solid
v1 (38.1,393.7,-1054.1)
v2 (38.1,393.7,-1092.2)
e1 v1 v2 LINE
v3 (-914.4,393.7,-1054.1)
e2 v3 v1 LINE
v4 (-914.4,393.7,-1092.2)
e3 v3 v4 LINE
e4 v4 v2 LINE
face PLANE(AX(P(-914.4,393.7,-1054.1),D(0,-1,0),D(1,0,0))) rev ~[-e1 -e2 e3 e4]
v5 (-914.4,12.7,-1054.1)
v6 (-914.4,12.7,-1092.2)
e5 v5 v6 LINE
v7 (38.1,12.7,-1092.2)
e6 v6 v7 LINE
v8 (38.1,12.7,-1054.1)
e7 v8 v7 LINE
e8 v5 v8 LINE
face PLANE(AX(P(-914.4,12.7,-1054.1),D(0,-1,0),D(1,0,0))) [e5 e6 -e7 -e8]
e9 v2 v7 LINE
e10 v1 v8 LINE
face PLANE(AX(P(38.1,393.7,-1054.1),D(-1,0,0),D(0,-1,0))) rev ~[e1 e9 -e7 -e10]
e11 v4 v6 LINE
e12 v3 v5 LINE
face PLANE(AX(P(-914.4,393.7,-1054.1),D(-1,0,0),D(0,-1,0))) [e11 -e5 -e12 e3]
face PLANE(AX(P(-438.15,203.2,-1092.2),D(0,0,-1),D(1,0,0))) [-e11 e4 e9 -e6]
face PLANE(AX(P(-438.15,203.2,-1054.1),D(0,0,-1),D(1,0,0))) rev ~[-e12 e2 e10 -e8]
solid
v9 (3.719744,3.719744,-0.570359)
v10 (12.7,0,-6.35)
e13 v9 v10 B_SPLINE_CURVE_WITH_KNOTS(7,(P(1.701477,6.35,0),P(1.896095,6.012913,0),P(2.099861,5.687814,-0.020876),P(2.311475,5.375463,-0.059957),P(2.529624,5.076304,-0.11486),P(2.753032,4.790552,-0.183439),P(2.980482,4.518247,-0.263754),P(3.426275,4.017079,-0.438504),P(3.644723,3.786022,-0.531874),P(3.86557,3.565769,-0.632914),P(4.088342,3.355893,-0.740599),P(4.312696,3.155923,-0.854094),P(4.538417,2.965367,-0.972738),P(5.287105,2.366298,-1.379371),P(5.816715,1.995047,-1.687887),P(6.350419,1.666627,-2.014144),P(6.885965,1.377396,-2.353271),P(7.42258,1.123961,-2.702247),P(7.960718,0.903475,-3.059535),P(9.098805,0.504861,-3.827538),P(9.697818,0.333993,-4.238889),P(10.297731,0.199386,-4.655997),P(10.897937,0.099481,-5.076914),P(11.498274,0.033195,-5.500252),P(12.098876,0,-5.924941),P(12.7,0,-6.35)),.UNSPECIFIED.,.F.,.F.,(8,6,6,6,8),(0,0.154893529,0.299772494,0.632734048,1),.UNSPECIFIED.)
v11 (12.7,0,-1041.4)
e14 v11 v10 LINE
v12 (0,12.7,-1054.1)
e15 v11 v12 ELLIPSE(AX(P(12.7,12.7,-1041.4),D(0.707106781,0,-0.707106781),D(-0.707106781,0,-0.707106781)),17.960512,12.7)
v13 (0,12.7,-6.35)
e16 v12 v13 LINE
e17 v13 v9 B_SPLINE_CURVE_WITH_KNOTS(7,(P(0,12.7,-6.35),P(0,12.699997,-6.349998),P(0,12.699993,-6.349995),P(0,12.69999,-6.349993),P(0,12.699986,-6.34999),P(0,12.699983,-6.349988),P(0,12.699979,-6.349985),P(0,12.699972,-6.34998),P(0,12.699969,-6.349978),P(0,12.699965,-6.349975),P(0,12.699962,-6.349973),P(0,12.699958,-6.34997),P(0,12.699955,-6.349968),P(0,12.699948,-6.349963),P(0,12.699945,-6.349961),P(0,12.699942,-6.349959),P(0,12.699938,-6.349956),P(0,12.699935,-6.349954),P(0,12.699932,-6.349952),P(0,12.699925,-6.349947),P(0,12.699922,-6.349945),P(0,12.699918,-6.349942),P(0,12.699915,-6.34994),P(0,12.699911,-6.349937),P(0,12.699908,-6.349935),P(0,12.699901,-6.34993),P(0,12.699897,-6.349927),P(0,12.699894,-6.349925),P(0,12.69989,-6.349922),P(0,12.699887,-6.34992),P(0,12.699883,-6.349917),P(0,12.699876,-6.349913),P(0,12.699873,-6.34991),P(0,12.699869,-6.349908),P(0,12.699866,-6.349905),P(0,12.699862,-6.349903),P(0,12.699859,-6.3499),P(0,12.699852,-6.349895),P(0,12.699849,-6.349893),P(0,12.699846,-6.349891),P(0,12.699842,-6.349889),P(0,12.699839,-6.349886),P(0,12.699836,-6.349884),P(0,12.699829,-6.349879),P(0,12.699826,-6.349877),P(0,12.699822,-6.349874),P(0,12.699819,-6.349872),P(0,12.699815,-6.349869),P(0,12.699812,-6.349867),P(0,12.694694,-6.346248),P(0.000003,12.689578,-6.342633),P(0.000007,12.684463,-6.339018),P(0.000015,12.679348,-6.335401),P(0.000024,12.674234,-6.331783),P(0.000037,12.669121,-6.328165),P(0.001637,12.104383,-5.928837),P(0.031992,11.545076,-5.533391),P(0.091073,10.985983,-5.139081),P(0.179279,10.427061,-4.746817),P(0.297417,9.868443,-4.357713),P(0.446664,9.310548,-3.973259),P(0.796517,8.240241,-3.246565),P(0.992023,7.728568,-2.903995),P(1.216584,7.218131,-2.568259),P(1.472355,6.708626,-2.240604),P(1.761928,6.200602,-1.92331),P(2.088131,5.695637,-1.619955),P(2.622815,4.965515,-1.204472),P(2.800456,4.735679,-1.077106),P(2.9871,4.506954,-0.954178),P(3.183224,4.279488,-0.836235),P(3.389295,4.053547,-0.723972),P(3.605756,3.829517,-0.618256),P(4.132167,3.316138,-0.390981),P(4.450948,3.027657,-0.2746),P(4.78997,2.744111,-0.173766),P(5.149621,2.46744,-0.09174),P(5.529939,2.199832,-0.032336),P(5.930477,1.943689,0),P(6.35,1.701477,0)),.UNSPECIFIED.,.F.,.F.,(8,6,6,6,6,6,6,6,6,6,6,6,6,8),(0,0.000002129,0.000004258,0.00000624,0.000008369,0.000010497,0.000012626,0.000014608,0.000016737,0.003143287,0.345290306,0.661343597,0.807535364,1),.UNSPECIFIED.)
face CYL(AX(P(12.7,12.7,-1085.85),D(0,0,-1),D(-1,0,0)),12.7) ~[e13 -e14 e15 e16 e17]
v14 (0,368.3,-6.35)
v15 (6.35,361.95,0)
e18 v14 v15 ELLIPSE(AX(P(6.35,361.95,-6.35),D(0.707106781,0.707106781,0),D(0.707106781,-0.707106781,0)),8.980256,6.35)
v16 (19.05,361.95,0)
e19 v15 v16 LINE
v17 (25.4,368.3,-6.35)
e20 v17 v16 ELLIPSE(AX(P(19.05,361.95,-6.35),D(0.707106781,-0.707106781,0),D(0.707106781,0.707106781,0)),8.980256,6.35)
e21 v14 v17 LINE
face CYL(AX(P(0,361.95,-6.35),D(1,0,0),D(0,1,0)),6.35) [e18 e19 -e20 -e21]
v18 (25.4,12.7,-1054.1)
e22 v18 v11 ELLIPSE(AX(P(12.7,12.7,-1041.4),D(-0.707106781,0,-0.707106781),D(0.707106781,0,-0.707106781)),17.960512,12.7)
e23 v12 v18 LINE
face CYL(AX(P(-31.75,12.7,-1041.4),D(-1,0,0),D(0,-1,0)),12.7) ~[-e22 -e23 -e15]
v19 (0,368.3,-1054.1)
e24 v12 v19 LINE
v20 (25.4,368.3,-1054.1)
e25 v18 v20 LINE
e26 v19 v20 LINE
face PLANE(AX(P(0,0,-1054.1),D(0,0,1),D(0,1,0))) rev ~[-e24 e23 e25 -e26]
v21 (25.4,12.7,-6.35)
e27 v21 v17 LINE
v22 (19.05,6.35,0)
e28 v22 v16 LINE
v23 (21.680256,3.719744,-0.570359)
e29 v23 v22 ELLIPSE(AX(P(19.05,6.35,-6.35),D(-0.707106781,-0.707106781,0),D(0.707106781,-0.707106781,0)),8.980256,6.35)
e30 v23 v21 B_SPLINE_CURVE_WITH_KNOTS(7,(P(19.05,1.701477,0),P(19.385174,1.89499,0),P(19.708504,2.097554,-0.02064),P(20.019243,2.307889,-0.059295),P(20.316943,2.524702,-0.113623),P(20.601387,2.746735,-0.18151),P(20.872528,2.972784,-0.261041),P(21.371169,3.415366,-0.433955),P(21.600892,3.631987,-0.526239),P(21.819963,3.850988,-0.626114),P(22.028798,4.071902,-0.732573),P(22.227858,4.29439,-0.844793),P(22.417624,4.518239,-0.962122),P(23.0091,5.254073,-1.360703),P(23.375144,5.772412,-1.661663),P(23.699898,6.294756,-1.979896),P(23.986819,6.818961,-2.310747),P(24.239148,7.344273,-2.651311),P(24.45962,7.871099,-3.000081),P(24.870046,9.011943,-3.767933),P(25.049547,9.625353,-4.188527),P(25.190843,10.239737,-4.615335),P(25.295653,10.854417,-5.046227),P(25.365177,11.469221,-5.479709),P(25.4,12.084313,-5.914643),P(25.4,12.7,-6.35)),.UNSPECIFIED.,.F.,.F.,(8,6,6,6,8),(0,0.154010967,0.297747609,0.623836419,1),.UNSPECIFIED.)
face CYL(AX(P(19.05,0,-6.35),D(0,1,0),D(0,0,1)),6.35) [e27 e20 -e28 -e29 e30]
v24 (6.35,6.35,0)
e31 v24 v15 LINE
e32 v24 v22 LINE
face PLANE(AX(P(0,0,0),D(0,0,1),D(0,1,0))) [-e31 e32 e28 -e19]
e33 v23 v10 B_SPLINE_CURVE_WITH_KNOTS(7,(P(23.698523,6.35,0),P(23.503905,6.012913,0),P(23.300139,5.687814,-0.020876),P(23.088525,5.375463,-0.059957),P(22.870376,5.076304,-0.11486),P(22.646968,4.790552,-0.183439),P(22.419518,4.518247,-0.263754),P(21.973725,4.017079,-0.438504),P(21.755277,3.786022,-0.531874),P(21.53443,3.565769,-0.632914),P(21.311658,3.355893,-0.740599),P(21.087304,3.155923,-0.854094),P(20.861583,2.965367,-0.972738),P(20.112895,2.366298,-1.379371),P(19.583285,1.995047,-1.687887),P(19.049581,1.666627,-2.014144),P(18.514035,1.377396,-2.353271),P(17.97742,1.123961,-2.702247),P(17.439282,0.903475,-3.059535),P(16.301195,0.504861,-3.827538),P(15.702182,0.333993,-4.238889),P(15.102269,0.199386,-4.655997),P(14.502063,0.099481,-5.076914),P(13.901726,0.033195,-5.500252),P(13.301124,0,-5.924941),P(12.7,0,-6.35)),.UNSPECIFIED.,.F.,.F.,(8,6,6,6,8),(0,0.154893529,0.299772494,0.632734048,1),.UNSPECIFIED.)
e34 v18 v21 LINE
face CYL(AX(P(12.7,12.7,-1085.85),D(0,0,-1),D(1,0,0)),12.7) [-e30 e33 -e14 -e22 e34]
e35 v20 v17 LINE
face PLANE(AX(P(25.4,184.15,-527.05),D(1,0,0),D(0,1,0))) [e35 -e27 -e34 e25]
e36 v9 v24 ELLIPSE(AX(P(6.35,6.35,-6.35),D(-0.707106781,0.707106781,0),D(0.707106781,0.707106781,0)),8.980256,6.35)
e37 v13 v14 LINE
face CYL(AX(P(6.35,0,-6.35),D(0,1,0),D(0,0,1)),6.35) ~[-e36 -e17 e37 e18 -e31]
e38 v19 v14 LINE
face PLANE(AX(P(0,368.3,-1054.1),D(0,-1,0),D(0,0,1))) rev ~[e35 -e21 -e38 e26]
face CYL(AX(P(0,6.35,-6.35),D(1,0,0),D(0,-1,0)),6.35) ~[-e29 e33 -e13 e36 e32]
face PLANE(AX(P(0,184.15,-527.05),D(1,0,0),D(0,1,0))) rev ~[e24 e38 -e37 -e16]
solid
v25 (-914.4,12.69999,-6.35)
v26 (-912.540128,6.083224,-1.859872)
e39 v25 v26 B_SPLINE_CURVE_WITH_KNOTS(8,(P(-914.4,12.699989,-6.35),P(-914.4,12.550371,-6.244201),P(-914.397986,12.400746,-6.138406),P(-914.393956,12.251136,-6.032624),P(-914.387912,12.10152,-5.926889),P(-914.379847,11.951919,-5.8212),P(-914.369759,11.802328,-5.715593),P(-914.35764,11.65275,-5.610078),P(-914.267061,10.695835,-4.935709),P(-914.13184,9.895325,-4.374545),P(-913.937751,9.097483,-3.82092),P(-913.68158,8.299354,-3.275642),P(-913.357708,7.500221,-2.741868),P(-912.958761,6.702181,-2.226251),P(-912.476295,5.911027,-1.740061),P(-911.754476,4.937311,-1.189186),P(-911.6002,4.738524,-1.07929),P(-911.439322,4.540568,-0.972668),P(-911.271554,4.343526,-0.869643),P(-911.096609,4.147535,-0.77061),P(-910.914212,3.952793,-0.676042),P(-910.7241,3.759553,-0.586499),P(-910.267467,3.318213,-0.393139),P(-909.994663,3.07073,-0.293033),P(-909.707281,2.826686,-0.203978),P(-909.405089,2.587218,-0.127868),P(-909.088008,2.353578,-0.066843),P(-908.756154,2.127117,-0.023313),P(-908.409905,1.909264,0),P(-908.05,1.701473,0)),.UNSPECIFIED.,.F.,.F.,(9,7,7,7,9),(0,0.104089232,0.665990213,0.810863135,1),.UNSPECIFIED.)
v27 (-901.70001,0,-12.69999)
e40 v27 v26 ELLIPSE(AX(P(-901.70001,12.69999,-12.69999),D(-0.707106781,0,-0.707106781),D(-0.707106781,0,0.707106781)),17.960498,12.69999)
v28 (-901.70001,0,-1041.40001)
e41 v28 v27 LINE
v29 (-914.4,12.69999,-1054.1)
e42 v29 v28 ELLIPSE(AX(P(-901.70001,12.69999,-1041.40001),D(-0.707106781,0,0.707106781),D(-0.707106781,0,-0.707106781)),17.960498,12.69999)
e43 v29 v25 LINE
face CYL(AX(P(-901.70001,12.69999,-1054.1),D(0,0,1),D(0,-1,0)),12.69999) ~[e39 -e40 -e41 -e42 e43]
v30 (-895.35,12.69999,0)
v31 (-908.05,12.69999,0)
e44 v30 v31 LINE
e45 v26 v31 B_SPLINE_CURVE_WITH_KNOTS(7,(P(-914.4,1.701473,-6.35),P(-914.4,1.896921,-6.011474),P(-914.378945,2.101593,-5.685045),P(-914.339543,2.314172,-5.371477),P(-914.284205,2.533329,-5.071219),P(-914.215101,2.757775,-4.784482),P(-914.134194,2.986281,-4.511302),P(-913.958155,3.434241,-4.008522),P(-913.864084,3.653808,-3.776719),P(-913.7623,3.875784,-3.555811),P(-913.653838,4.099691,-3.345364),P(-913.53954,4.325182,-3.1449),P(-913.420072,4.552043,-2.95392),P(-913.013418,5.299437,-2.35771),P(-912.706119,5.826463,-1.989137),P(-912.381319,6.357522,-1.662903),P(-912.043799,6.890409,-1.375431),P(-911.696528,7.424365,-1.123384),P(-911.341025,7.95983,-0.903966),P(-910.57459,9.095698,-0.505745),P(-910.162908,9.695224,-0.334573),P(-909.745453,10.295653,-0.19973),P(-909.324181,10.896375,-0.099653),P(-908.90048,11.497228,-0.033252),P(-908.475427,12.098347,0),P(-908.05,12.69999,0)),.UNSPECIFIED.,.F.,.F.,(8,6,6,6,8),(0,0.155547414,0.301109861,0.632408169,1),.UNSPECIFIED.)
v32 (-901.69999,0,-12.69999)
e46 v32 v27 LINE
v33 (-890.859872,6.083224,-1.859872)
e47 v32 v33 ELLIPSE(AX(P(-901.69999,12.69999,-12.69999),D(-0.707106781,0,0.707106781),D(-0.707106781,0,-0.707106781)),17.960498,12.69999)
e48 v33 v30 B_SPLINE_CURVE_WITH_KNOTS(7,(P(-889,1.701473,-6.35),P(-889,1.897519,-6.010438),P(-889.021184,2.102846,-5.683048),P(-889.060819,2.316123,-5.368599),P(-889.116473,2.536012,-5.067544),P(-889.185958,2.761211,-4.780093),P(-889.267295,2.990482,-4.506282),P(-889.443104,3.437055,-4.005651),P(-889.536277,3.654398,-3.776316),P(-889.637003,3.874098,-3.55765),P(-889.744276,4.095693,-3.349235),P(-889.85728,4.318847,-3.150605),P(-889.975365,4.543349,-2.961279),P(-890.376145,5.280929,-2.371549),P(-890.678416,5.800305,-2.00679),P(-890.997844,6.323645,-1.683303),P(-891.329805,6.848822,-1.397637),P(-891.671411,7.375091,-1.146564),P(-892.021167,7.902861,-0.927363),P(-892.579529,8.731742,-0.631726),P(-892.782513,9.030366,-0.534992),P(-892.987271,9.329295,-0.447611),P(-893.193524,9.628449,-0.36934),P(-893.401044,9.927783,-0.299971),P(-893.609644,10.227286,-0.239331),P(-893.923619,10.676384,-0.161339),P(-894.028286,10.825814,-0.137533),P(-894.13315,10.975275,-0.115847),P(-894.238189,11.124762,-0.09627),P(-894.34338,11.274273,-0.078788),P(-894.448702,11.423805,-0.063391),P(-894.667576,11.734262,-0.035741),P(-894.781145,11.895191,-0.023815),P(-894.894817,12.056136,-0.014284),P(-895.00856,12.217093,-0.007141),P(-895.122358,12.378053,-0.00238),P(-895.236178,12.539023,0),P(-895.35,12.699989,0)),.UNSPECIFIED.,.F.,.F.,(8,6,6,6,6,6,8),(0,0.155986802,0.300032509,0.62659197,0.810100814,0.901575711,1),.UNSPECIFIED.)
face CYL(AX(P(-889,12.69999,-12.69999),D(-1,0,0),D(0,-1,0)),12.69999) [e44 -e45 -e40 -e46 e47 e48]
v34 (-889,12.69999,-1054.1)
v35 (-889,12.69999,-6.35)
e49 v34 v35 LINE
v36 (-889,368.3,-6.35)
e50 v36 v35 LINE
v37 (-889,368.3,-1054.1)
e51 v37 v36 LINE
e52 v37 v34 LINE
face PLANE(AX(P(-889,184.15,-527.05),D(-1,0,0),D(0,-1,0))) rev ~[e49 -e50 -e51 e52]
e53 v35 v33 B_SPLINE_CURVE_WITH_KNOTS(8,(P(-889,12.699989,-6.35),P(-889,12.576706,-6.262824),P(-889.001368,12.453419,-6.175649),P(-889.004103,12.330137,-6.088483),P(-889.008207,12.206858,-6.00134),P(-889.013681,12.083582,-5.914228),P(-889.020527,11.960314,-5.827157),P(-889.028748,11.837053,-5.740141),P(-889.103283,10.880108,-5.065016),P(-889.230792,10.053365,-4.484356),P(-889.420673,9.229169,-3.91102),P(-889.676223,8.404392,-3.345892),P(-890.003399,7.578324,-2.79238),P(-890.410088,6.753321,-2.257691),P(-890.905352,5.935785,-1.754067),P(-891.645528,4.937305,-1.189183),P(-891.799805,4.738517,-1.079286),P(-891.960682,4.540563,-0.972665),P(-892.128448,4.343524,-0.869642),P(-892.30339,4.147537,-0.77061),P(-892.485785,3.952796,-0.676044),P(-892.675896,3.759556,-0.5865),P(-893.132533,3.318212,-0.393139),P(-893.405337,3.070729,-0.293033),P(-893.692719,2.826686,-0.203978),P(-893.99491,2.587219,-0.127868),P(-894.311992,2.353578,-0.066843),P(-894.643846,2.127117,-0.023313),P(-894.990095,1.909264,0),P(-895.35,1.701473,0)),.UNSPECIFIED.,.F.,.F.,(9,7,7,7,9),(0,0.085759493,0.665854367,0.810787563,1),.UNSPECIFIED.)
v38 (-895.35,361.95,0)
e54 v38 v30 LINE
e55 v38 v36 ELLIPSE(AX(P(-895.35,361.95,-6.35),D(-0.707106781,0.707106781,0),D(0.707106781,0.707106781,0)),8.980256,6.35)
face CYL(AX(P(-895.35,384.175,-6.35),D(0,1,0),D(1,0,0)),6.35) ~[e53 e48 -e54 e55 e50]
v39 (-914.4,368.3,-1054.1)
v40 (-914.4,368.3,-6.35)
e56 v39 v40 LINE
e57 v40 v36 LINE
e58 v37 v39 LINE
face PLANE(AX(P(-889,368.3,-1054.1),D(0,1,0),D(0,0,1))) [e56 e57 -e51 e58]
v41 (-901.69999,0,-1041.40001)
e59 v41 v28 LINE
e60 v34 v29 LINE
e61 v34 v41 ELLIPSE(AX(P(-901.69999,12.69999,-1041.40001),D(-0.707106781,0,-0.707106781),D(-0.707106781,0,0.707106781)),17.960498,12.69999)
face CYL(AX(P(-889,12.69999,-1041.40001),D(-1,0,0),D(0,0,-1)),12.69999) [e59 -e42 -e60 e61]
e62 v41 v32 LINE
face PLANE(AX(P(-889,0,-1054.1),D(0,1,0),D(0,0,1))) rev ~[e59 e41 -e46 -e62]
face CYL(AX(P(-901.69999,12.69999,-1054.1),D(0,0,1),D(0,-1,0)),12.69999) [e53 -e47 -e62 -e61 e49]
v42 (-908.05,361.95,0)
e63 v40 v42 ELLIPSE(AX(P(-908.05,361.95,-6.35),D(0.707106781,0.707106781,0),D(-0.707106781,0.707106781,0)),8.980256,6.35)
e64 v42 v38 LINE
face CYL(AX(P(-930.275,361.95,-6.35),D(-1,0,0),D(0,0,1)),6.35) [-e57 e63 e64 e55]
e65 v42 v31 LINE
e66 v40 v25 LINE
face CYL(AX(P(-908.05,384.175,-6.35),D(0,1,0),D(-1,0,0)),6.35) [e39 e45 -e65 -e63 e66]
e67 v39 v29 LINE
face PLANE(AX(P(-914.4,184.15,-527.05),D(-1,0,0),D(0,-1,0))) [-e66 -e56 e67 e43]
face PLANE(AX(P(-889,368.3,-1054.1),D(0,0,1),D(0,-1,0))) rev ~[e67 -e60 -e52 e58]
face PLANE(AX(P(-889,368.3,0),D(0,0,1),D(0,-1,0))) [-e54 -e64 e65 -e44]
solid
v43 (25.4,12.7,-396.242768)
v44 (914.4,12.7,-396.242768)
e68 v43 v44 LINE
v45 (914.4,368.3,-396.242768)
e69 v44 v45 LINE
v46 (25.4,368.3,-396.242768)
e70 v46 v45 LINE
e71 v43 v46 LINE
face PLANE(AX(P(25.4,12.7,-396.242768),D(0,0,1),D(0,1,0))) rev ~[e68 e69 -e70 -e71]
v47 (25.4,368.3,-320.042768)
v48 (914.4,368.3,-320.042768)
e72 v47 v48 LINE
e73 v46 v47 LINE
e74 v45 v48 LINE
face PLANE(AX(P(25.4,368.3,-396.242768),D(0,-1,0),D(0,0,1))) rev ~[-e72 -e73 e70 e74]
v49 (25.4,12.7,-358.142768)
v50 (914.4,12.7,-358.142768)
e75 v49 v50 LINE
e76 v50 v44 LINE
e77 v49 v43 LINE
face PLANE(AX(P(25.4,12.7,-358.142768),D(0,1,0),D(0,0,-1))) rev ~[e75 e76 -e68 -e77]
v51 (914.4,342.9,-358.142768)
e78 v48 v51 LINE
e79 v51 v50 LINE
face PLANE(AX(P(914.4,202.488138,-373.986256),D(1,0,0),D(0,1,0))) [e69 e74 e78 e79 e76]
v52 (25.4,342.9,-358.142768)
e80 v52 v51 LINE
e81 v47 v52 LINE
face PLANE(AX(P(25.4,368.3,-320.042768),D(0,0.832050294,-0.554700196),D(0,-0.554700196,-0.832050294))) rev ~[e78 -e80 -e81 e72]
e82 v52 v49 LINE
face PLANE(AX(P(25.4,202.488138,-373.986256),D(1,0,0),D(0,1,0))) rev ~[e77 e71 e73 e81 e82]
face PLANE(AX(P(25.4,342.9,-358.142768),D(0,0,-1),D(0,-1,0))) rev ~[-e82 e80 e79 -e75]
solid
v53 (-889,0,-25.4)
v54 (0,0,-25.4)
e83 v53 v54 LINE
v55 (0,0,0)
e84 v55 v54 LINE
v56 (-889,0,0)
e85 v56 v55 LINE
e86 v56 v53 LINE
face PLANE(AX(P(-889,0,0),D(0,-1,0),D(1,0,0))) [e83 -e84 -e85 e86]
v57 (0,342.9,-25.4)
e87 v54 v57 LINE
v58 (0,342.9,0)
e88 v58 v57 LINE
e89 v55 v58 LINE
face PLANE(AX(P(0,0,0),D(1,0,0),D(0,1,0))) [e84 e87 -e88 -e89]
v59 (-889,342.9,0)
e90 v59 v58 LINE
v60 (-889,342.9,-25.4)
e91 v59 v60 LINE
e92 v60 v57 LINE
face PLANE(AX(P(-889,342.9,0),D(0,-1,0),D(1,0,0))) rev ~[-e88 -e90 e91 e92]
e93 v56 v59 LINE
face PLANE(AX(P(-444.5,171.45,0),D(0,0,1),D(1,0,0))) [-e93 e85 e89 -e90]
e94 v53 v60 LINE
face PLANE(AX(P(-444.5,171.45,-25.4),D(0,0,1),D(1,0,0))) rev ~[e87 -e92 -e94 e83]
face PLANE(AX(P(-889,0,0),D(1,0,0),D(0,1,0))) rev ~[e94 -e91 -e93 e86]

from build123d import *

# Parameters (mm, degrees)
F0_W        = 368.3
F0_H        = 1054.1
F1_DEPTH    = 25.4
F2_R        = 6.35
F3_T1_DEPTH = 1111.25
F3_T3_DEPTH = 88.9
F4_W        = 889
F4_H        = 342.9
F5_DEPTH    = 25.4
F6_W        = 368.3
F6_H        = 1054.1
F7_DEPTH    = 25.4
F8_R        = 12.69999
F9_T1_DEPTH = 387.35001
F9_T3_DEPTH = 57.15
F11_DEPTH   = 889
F12_W       = 952.5
F12_H       = 381
F13_DEPTH   = 38.1


# Not quite as in the source:
# - a fillet or chamfer that OpenCascade refuses, or shapes differently, is made with other operations: its cross-section is extruded or revolved along the edge and cut away or added
# - a fillet or chamfer is up to 0.001 mm smaller than in the source, because OpenCascade refuses the exact size


with BuildPart() as f1:
    # F0 (on Right) → F1 (new body)
    with BuildSketch(Plane.YZ):
        with Locations((184.15, -527.05)):
            Rectangle(F0_W, F0_H)
    extrude(amount=F1_DEPTH)

    # F2
    f2_edges = [f1.edges().sort_by_distance(p)[0] for p in [
        (12.7, 368.3, 0),
        (12.7, 0, 0),
        (0, 184.15, 0),
        (25.4, 184.15, 0),
    ]]
    fillet(f2_edges, radius=F2_R)

    # F3: fillet of radius 12.7 on 4 edges, made by hand

    # F3_s2 → F3_t1 (cut)
    with BuildSketch(Plane.XY.offset(-1085.85)):
        with BuildLine():
            ThreePointArc((0, 12.7), (3.7197438789, 3.7197438789), (12.7, 0))
            Line((12.7, 0), (0, 0))
            Line((0, 0), (0, 12.7))
        make_face()
        with BuildLine():
            ThreePointArc((25.4, 12.7), (21.6802561211, 3.7197438789), (12.7, 0))
            Line((12.7, 0), (25.4, 0))
            Line((25.4, 0), (25.4, 12.7))
        make_face()
    extrude(amount=F3_T1_DEPTH, mode=Mode.SUBTRACT)

    # F3_s4 → F3_t3 (cut)
    with BuildSketch(Plane.YZ.offset(-31.75)):
        with BuildLine():
            ThreePointArc((0, -1041.4), (3.7197438789, -1050.3802561211), (12.7, -1054.1))
            Line((12.7, -1054.1), (0, -1054.1))
            Line((0, -1054.1), (0, -1041.4))
        make_face()
    extrude(amount=F3_T3_DEPTH, mode=Mode.SUBTRACT)


with BuildPart() as f5:
    # F4 (on Top) → F5 (new body)
    with BuildSketch(Plane.XY):
        with Locations((-444.5, 171.45)):
            Rectangle(F4_W, F4_H)
    extrude(amount=-F5_DEPTH)


with BuildPart() as f7:
    # F6 (on face) → F7 (new body)
    with BuildSketch(Plane(origin=(-889, 0, 0), x_dir=(0, -1, 0), z_dir=(-1, 0, 0))):
        with Locations((-184.15, -527.05)):
            Rectangle(F6_W, F6_H)
    extrude(amount=F7_DEPTH)

    # F8 (radius 12.7 in the source; OpenCascade refuses exactly that, so slightly less here)
    f8_edges = [f7.edges().sort_by_distance(p)[0] for p in [
        (-901.7, 0, -1054.1),
        (-901.7, 0, 0),
        (-889, 0, -527.05),
        (-914.4, 0, -527.05),
    ]]
    fillet(f8_edges, radius=F8_R)

    # F9: fillet of radius 6.35 on 4 edges, made by hand

    # F9_s2 → F9_t1 (cut)
    with BuildSketch(Plane.XZ.offset(-384.175)):
        with BuildLine():
            ThreePointArc((-889, -6.35), (-890.8598719395, -1.8598719395), (-895.35, 0))
            Line((-895.35, 0), (-889, 0))
            Line((-889, 0), (-889, -6.35))
        make_face()
        with BuildLine():
            ThreePointArc((-914.4, -6.35), (-912.5401280605, -1.8598719395), (-908.05, 0))
            Line((-908.05, 0), (-914.4, 0))
            Line((-914.4, 0), (-914.4, -6.35))
        make_face()
    extrude(amount=F9_T1_DEPTH, mode=Mode.SUBTRACT)

    # F9_s4 → F9_t3 (cut)
    with BuildSketch(Plane.YZ.offset(-930.275)):
        with BuildLine():
            ThreePointArc((361.95, 0), (366.4401280605, -1.8598719395), (368.3, -6.35))
            Line((368.3, -6.35), (368.3, 0))
            Line((368.3, 0), (361.95, 0))
        make_face()
    extrude(amount=F9_T3_DEPTH, mode=Mode.SUBTRACT)


with BuildPart() as f11:
    # F10 (on face) → F11 (new body)
    with BuildSketch(Plane.YZ.offset(25.4)):
        Polygon((368.3, -396.2427675724), (368.3, -320.0427675724), (342.9, -358.1427675724), (12.7, -358.1427675724), (12.7, -396.2427675724), align=None)
    extrude(amount=F11_DEPTH)


with BuildPart() as f13:
    # F12 (on face) → F13 (new body)
    with BuildSketch(Plane(origin=(0, 0, -1054.1), x_dir=(1, 0, 0), z_dir=(0, 0, -1))):
        with Locations((-438.15, -203.2)):
            Rectangle(F12_W, F12_H)
    extrude(amount=F13_DEPTH)


solid = Compound([f1.part, f5.part, f7.part, f11.part, f13.part])
